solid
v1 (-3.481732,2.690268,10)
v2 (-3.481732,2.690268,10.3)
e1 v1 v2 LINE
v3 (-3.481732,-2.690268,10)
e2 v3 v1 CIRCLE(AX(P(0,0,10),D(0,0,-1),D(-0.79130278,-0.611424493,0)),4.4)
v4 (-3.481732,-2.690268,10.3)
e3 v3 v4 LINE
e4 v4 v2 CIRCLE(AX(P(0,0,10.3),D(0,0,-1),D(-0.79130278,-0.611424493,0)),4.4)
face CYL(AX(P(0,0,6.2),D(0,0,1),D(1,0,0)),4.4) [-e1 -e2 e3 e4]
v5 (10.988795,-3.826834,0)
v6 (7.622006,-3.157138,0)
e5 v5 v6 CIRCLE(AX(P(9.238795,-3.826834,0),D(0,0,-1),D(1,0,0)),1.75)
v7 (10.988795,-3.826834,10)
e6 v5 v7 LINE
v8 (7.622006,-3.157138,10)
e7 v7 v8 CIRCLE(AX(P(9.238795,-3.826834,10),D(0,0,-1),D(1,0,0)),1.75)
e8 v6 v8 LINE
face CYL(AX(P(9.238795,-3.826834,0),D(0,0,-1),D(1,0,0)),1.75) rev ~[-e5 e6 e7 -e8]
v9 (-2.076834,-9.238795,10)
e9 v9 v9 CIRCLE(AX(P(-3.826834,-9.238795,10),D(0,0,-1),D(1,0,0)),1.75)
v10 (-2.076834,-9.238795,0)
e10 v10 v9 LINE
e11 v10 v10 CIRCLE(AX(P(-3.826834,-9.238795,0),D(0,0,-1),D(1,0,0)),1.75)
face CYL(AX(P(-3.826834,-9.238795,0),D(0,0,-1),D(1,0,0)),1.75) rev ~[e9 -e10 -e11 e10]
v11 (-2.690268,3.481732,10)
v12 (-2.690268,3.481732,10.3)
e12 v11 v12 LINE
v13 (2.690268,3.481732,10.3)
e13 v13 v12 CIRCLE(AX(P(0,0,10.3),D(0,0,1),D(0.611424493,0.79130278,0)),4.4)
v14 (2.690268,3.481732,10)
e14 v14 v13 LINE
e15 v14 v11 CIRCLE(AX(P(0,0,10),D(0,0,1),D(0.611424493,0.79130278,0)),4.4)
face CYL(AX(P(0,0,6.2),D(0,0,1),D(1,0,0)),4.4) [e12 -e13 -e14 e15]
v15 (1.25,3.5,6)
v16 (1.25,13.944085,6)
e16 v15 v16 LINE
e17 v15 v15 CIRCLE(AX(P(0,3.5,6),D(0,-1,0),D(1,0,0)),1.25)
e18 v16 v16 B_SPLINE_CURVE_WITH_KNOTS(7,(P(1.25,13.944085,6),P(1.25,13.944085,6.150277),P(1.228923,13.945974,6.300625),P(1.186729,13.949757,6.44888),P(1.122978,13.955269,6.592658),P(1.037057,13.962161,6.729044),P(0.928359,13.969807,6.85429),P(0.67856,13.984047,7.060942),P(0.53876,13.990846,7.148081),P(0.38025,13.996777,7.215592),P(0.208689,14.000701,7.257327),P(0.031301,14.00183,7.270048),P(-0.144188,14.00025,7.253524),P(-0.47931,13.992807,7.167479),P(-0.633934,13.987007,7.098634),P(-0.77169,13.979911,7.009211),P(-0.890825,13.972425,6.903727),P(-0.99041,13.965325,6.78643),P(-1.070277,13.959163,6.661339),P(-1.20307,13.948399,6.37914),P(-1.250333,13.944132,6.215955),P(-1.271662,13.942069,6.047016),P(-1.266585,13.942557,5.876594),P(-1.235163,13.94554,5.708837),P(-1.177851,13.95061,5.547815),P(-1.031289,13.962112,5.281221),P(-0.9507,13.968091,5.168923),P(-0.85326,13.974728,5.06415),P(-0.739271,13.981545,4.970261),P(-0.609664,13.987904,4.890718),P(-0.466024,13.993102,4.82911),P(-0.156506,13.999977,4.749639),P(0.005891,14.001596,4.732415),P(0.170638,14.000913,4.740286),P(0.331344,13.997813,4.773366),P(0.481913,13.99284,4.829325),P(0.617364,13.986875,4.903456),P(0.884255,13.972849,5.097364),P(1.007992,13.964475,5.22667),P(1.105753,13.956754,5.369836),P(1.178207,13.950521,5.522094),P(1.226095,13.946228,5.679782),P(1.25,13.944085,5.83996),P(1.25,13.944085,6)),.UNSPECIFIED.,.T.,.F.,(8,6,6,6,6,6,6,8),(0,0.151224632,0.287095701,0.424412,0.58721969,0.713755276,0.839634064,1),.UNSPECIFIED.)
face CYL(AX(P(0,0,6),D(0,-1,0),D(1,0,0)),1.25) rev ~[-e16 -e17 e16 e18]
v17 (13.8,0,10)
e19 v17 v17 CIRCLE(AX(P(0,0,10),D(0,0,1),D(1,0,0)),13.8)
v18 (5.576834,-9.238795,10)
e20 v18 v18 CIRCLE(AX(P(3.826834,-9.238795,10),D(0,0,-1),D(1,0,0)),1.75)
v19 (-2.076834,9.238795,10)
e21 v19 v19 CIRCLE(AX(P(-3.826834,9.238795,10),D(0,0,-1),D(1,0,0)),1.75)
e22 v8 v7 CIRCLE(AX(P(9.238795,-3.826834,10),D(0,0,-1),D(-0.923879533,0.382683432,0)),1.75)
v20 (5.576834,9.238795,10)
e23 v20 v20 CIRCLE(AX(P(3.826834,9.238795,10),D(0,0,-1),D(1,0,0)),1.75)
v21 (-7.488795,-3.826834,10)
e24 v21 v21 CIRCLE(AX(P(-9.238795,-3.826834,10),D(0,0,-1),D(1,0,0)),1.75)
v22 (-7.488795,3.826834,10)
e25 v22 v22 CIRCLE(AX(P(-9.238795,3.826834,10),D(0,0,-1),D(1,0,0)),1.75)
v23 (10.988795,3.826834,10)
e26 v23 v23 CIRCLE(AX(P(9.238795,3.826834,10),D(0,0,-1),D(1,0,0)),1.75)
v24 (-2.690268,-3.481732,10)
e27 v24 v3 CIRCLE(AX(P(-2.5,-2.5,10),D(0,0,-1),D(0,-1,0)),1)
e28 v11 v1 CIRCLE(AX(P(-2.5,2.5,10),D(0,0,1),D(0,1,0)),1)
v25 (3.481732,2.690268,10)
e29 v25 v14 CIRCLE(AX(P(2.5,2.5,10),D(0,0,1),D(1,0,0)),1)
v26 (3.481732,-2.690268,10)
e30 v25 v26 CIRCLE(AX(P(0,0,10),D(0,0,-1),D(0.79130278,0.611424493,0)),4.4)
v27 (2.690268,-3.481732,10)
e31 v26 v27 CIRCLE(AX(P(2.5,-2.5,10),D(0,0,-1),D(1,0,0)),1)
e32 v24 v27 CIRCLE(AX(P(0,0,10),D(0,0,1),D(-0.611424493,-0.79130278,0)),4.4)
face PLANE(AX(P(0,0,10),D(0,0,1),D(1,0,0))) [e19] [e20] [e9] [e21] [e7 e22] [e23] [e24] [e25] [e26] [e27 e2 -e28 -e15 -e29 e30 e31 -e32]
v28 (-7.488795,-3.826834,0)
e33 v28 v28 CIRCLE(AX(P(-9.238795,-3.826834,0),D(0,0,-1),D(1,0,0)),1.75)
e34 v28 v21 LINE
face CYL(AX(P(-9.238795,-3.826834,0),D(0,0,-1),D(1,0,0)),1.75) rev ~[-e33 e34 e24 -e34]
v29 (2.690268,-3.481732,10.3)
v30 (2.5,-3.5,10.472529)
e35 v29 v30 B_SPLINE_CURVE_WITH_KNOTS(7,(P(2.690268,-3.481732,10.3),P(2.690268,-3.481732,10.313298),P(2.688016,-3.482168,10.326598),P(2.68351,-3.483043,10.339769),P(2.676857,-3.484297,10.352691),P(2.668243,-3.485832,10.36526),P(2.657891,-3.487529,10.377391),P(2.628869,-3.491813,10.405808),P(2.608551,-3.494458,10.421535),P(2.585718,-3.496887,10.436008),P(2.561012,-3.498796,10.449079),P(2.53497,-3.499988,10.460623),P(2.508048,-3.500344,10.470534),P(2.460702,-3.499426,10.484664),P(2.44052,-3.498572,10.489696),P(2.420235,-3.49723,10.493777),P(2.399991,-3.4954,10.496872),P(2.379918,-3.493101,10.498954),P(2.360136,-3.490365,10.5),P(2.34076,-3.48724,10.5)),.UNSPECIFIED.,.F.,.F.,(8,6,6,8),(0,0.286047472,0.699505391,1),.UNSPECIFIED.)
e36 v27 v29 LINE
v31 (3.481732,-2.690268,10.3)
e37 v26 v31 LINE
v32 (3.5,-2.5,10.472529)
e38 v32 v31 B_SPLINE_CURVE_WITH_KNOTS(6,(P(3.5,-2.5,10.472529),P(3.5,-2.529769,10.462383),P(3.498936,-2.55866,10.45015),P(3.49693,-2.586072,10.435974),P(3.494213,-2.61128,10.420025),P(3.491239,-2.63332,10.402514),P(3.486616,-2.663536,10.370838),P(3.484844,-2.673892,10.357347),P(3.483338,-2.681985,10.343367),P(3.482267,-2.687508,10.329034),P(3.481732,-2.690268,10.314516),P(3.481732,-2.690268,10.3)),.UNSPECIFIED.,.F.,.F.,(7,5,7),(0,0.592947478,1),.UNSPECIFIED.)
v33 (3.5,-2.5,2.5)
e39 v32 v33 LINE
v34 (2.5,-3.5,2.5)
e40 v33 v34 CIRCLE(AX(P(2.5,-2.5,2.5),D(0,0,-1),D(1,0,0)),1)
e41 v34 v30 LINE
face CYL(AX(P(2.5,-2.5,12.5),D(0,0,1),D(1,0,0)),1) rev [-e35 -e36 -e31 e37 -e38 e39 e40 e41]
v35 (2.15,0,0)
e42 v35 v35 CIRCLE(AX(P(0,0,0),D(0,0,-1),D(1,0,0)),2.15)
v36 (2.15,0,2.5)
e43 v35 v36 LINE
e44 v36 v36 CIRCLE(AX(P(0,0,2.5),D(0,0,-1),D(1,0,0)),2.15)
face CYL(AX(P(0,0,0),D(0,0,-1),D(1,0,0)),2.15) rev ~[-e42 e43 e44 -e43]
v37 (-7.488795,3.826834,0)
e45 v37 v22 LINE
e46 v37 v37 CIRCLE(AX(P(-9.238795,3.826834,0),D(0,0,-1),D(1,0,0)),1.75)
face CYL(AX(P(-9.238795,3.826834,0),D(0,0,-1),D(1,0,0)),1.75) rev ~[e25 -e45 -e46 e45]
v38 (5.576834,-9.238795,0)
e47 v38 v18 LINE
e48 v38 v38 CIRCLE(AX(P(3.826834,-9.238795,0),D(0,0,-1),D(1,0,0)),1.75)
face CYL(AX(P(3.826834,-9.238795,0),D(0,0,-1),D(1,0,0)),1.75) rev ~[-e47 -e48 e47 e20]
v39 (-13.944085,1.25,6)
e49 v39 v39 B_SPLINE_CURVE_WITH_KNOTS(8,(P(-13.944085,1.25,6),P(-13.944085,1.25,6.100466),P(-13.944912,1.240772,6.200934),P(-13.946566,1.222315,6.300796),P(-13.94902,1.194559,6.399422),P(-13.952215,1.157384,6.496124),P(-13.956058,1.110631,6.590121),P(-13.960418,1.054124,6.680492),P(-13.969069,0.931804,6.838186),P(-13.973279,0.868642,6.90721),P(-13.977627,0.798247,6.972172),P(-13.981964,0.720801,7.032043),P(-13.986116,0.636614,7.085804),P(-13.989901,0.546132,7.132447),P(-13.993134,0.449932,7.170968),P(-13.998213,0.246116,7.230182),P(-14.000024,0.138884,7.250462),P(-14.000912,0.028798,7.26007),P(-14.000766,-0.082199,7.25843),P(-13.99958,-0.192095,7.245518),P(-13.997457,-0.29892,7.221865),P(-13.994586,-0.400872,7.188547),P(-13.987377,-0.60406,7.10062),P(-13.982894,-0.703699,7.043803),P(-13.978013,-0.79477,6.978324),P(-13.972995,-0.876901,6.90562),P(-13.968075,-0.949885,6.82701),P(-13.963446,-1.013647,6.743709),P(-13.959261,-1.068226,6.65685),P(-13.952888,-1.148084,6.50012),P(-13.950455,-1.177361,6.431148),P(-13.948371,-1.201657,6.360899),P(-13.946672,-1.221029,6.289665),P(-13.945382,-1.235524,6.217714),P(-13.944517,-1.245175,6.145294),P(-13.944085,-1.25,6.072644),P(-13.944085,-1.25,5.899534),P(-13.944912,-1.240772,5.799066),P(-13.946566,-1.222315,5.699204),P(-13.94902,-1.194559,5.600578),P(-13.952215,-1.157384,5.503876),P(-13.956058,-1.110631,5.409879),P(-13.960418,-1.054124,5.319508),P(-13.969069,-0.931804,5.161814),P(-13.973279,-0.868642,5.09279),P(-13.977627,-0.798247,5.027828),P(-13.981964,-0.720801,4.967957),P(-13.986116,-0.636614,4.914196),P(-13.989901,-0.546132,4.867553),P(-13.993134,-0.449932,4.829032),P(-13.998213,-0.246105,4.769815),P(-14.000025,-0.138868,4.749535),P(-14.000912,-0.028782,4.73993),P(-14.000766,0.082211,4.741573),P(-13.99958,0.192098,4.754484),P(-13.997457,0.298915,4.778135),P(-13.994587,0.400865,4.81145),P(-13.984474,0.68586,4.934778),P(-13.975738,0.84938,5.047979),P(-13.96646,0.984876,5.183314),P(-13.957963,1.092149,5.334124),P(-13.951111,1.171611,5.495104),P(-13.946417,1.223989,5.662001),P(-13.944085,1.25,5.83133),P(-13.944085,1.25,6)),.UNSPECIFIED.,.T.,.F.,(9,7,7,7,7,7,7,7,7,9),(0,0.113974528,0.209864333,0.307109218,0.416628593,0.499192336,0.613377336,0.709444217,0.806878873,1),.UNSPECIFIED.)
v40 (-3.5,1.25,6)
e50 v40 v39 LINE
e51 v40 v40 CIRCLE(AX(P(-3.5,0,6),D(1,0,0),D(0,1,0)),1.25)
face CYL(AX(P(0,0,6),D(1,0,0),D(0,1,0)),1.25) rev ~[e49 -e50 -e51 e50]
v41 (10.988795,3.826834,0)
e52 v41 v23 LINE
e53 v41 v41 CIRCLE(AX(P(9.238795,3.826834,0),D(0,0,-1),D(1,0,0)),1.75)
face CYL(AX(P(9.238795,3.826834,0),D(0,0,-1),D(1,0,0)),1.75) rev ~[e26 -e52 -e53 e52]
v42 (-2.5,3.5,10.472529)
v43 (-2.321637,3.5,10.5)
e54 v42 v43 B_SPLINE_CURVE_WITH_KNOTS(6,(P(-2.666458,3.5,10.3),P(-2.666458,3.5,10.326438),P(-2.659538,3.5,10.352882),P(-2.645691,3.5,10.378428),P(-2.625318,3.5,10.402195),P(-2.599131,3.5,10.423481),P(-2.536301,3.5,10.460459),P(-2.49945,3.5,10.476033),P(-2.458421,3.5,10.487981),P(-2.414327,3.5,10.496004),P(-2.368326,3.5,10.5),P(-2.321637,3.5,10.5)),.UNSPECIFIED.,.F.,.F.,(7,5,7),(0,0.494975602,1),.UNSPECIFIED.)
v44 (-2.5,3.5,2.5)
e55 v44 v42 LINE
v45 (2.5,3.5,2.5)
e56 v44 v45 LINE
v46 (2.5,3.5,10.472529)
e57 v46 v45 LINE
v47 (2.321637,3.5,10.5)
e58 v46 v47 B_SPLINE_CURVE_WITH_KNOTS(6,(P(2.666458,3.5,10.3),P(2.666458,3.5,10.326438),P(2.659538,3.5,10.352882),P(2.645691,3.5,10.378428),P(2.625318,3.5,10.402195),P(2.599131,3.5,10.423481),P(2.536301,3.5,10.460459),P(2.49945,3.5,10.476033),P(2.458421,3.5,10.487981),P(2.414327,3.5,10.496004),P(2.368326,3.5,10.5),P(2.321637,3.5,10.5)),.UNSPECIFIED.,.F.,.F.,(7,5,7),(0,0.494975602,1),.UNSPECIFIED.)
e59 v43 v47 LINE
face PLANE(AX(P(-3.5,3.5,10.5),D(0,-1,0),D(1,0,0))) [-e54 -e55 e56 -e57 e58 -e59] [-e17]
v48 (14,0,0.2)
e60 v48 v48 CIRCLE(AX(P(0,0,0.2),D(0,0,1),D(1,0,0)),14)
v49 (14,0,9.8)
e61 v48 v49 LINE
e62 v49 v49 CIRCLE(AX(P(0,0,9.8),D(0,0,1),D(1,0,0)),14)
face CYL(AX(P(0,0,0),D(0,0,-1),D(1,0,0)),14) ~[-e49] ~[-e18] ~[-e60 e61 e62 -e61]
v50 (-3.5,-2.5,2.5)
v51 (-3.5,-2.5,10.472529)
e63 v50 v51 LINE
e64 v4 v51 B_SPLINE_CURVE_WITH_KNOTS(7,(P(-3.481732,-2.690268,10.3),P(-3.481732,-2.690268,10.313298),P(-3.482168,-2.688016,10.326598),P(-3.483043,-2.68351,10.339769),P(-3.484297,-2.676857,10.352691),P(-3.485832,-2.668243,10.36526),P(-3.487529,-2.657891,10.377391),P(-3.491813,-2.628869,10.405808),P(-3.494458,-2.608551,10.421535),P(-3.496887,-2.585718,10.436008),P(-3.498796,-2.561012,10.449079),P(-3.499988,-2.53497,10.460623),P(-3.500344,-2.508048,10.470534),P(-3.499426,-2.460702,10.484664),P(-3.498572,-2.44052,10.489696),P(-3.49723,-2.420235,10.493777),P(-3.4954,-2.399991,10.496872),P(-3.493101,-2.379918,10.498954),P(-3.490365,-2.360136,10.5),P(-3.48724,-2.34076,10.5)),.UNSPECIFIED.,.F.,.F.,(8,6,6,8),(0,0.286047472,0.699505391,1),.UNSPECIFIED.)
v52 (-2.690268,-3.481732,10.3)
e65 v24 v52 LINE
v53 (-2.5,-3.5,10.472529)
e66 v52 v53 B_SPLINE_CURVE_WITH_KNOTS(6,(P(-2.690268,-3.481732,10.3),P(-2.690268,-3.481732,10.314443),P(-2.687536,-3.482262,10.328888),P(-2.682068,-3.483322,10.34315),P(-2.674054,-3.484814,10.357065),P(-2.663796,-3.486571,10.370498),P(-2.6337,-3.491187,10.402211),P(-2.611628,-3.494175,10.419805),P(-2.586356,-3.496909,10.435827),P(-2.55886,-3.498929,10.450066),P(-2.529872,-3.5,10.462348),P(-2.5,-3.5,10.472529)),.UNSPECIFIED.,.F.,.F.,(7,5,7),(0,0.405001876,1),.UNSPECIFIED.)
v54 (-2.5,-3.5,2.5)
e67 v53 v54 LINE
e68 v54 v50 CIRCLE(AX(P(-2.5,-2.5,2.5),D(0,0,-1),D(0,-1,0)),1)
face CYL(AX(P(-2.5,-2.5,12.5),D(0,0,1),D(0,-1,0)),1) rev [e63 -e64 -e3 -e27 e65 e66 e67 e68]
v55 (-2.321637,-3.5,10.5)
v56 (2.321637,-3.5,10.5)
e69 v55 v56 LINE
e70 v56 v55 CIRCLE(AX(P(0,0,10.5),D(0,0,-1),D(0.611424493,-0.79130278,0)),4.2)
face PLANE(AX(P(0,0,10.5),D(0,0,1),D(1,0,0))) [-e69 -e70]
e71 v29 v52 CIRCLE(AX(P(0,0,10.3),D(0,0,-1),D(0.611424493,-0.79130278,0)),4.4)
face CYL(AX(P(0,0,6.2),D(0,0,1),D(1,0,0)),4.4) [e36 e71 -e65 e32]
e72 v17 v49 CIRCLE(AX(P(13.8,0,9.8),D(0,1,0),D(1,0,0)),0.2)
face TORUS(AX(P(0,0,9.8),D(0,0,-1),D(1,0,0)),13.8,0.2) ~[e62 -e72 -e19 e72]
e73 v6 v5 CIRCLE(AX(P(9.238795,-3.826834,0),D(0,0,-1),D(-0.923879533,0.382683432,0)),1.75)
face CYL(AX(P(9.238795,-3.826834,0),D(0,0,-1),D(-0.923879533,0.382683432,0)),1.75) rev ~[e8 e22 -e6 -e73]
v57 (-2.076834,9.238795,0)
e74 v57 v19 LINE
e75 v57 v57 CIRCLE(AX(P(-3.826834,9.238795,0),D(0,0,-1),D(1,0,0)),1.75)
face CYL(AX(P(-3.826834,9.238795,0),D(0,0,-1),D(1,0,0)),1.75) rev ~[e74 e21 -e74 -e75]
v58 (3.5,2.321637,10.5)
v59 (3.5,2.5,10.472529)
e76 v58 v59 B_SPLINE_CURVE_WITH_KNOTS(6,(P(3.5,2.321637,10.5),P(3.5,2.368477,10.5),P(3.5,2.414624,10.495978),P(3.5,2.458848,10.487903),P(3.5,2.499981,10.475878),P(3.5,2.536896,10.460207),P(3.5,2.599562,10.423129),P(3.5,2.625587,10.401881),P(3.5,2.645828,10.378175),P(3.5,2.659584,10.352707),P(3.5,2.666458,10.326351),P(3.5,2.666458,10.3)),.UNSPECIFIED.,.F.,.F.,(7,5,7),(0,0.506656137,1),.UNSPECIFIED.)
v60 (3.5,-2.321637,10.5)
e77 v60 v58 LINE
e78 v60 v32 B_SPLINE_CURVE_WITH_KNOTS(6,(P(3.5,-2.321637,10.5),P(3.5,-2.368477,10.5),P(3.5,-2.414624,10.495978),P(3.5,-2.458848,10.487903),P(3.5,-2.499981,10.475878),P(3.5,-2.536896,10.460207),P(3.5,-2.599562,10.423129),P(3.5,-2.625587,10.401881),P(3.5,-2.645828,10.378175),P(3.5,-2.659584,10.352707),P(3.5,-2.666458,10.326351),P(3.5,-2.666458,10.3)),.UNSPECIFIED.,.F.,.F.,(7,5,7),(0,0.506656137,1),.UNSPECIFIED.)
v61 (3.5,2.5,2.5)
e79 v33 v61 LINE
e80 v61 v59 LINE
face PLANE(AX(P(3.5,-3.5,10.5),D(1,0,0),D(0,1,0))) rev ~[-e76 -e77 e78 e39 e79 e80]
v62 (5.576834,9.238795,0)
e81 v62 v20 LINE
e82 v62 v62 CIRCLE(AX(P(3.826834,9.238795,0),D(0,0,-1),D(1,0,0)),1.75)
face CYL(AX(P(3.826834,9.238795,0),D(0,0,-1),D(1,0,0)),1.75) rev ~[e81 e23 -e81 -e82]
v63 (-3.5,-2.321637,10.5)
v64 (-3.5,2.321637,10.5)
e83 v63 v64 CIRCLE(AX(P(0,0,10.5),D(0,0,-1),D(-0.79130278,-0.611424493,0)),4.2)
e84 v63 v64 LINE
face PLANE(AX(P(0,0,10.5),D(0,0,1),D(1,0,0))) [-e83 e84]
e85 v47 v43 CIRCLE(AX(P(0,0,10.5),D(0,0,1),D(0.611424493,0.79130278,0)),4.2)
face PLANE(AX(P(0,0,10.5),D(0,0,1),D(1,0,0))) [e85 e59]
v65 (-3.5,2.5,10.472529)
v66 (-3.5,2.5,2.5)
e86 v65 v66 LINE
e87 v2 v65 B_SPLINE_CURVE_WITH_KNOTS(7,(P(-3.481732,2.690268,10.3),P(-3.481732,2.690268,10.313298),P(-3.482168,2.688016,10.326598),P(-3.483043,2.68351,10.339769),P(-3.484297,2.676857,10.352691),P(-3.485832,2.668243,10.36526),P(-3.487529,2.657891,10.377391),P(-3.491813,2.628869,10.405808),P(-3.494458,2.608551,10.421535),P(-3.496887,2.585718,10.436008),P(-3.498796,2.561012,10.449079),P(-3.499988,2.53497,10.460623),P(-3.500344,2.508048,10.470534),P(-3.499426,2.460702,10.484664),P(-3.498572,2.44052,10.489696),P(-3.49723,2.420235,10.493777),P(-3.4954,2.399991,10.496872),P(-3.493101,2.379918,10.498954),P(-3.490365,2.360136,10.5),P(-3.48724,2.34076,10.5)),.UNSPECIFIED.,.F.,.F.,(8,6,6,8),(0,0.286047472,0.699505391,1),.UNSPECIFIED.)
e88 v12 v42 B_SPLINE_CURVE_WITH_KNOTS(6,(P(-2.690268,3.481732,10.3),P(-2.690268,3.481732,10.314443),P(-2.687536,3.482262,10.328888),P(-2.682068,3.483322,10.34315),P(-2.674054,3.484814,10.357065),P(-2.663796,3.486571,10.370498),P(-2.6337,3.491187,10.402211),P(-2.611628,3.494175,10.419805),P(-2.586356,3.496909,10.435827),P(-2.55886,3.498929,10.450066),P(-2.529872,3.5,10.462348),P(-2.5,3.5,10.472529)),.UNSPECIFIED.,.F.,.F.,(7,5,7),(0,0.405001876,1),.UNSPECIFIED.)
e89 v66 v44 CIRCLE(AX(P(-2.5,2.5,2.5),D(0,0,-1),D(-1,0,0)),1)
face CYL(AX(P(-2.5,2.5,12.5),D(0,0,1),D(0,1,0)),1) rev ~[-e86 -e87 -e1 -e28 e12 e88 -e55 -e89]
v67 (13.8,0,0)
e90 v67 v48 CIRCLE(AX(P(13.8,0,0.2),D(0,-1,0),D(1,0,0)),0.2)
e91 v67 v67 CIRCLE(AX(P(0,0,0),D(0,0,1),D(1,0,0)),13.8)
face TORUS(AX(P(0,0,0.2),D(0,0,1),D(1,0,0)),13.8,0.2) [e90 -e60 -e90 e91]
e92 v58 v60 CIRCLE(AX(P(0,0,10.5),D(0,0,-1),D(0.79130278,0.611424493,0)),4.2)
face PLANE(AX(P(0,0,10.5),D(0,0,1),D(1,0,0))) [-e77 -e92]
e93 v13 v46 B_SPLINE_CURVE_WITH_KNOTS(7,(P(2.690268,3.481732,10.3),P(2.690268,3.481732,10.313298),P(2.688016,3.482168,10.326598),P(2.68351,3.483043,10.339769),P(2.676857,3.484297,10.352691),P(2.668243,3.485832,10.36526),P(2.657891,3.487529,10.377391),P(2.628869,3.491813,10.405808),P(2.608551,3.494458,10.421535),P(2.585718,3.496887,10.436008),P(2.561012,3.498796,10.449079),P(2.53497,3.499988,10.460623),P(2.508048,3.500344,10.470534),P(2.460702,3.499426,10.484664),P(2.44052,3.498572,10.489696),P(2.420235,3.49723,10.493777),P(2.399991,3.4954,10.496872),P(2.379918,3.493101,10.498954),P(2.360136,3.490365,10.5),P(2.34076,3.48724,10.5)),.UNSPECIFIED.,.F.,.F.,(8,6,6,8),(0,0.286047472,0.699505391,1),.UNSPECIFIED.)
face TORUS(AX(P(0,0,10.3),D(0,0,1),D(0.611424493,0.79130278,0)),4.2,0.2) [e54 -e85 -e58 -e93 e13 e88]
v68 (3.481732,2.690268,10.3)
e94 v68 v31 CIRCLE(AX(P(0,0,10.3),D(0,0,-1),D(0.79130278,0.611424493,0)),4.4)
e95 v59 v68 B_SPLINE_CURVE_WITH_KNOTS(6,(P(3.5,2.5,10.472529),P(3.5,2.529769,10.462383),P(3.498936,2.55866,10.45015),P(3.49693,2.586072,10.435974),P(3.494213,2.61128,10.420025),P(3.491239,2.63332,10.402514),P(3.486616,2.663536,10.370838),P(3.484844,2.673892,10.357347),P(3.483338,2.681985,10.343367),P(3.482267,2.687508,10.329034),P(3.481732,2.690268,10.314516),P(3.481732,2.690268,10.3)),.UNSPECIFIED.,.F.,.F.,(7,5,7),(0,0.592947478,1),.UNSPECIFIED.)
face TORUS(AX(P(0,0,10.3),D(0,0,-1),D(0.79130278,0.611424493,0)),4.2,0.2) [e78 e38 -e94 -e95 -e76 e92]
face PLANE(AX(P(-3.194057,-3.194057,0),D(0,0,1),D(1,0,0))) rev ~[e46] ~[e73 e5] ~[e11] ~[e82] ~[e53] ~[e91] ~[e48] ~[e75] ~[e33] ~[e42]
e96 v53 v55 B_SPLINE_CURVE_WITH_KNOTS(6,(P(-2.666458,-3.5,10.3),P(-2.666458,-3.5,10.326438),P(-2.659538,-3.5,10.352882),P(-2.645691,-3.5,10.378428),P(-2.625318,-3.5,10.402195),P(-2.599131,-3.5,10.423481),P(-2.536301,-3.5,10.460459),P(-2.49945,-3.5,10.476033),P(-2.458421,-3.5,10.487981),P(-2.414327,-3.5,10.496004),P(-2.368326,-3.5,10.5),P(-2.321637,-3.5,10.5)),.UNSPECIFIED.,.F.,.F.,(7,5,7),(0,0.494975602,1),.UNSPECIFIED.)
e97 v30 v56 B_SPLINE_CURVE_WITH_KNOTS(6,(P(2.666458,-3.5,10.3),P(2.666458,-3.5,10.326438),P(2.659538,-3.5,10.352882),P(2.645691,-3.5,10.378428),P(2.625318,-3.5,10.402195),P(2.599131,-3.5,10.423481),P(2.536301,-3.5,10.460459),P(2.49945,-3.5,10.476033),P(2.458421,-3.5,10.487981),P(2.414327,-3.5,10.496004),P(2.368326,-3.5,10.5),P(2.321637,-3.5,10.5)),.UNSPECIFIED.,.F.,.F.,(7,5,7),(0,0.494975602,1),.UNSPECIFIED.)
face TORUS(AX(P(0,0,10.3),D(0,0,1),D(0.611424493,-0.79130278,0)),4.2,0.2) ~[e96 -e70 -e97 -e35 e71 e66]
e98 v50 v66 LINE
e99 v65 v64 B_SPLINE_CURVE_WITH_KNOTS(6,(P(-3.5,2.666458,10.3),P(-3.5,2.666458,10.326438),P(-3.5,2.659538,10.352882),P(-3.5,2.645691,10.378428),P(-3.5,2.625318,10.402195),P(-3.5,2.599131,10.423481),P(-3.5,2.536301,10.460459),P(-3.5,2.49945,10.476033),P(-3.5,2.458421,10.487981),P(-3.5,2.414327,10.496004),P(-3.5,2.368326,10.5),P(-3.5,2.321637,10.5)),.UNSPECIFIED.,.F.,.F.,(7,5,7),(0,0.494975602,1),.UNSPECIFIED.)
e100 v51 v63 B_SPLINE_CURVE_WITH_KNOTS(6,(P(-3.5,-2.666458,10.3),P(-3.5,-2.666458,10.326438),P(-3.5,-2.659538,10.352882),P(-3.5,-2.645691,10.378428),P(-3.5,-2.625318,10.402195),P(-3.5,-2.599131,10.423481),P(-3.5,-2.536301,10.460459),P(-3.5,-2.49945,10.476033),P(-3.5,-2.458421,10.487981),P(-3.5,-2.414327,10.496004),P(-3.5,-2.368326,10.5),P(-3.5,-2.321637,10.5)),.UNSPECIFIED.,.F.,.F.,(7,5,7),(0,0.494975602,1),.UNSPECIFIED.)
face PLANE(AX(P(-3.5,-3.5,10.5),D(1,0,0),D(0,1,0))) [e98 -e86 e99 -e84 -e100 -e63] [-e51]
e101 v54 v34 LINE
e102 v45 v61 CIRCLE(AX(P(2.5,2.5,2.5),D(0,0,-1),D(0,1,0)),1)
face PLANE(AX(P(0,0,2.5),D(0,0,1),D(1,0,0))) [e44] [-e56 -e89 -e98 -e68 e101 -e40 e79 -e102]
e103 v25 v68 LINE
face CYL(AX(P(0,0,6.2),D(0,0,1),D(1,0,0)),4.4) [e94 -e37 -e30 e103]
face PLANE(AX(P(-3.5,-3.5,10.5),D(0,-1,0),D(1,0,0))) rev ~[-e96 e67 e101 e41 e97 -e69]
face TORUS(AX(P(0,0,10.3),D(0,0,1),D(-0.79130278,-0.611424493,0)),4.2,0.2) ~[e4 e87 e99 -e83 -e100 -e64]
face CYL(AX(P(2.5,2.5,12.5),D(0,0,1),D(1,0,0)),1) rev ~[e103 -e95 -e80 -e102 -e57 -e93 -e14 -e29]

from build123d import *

# Parameters (mm, degrees)
F0_R          = 14
F1_DEPTH      = 10
F2_R          = 4.4
F3_DEPTH      = 0.5
F4_W          = 7
F4_H          = 7
F5_DEPTH      = 8
F6_R          = 2.15
F7_DEPTH      = 2.5
F8_R          = 1.75
F9_DEPTH      = 10
F10_R         = 1.25
F11_DEPTH     = 25
F12_R         = 1.25
F13_DEPTH     = 25
F14_T1_DEPTH  = 10
F14_T6_DEPTH  = 12.5
F14_S7_R      = 4.4
F14_T8_DEPTH  = 8
F14_T13_DEPTH = 12.5
F14_S14_R     = 4.4
F14_T15_DEPTH = 8
F14_T20_DEPTH = 12.5
F14_S21_R     = 4.4
F14_T22_DEPTH = 8
F14_T27_DEPTH = 12.5
F14_S28_R     = 4.4
F14_T29_DEPTH = 8
F15_R         = 0.2


# Not quite as in the source:
# - a fillet or chamfer that OpenCascade refuses, or shapes differently, is made with other operations: its cross-section is extruded or revolved along the edge and cut away or added
# - a feature names something its author has since deleted; it is built from what else it names


with BuildPart() as f1:
    # F0 (on Top) → F1 (new body)
    with BuildSketch(Plane.XY):
        Circle(F0_R)
    extrude(amount=F1_DEPTH)

    # F2 (on face) → F3 (join)
    with BuildSketch(Plane.XY.offset(10)):
        Circle(F2_R)
    extrude(amount=F3_DEPTH)

    # F4 (on face) → F5 (cut)
    with BuildSketch(Plane.XY.offset(10.5)):
        Rectangle(F4_W, F4_H)
    extrude(amount=-F5_DEPTH, mode=Mode.SUBTRACT)

    # F6 (on face) → F7 (cut, through all)
    with BuildSketch(Plane(origin=(0, 0, 0), x_dir=(1, 0, 0), z_dir=(0, 0, -1))):
        Circle(F6_R)
    extrude(amount=-F7_DEPTH, mode=Mode.SUBTRACT)

    # F8 (on face) → F9 (cut, through all)
    with BuildSketch(Plane(origin=(0, 0, 0), x_dir=(1, 0, 0), z_dir=(0, 0, -1))):
        with BuildLine():
            ThreePointArc((7.6220061432, 3.157138317), (9.5802033886, 2.1104600829), (10.9887953251, 3.8268343237))
            ThreePointArc((10.9887953251, 3.8268343237), (8.8973872616, 5.5432085644), (7.6220061432, 3.157138317))
        make_face()
        with Locations((3.8268343237, 9.2387953251)):
            Circle(F8_R)
        with Locations((-3.8268343237, 9.2387953251)):
            Circle(F8_R)
        with Locations((-9.2387953251, 3.8268343237)):
            Circle(F8_R)
        with Locations((-9.2387953251, -3.8268343237)):
            Circle(F8_R)
        with Locations((-3.8268343237, -9.2387953251)):
            Circle(F8_R)
        with Locations((3.8268343237, -9.2387953251)):
            Circle(F8_R)
        with Locations((9.2387953251, -3.8268343237)):
            Circle(F8_R)
    extrude(amount=-F9_DEPTH, mode=Mode.SUBTRACT)

    # F10 (on Front) → F11 (cut)
    with BuildSketch(Plane.XZ):
        with Locations((0, 6)):
            Circle(F10_R)
    extrude(amount=-F11_DEPTH, mode=Mode.SUBTRACT)

    # F12 (on Right) → F13 (cut)
    with BuildSketch(Plane.YZ):
        with Locations((0, 6)):
            Circle(F12_R)
    extrude(amount=-F13_DEPTH, mode=Mode.SUBTRACT)

    # F14: fillet of radius 1 on 4 edges, made by hand

    # F14_s2 → F14_t1 (join)
    with BuildSketch(Plane.XY):
        with BuildLine():
            ThreePointArc((-2.5, -3.5), (-3.2071067812, -3.2071067812), (-3.5, -2.5))
            Line((-3.5, -2.5), (-3.5, -3.5))
            Line((-3.5, -3.5), (-2.5, -3.5))
        make_face()
        with BuildLine():
            ThreePointArc((3.5, -2.5), (3.2071067812, -3.2071067812), (2.5, -3.5))
            Line((2.5, -3.5), (3.5, -3.5))
            Line((3.5, -3.5), (3.5, -2.5))
        make_face()
        with BuildLine():
            ThreePointArc((3.5, 2.5), (3.2071067812, 3.2071067812), (2.5, 3.5))
            Line((2.5, 3.5), (3.5, 3.5))
            Line((3.5, 3.5), (3.5, 2.5))
        make_face()
        with BuildLine():
            ThreePointArc((-2.5, 3.5), (-3.2071067812, 3.2071067812), (-3.5, 2.5))
            Line((-3.5, 2.5), (-3.5, 3.5))
            Line((-3.5, 3.5), (-2.5, 3.5))
        make_face()
    extrude(amount=F14_T1_DEPTH)


with BuildPart() as f14_tool4:
    # F14_s5 → F14_t6 (new body)
    with BuildSketch(Plane.XY.offset(12.5)):
        with BuildLine():
            ThreePointArc((-2.5, -3.5), (-3.2071067812, -3.2071067812), (-3.5, -2.5))
            Line((-3.5, -2.5), (-3.5, -3.5))
            Line((-3.5, -3.5), (-2.5, -3.5))
        make_face()
    extrude(amount=-F14_T6_DEPTH)

    # F14_s7 → F14_t8 (intersect, symmetric)
    with BuildSketch(Plane.XY.offset(6.2)):
        Circle(F14_S7_R)
    extrude(amount=F14_T8_DEPTH, both=True, mode=Mode.INTERSECT)

    split(bisect_by=Plane.XY.offset(10.5), keep=Keep.BOTTOM)


with BuildPart() as f1_1:
    add(f1.part)

    # F14_t3: union F14_tool4
    add(f14_tool4.part)


with BuildPart() as f14_tool11:
    # F14_s12 → F14_t13 (new body)
    with BuildSketch(Plane.XY.offset(12.5)):
        with BuildLine():
            ThreePointArc((3.5, -2.5), (3.2071067812, -3.2071067812), (2.5, -3.5))
            Line((2.5, -3.5), (3.5, -3.5))
            Line((3.5, -3.5), (3.5, -2.5))
        make_face()
    extrude(amount=-F14_T13_DEPTH)

    # F14_s14 → F14_t15 (intersect, symmetric)
    with BuildSketch(Plane.XY.offset(6.2)):
        Circle(F14_S14_R)
    extrude(amount=F14_T15_DEPTH, both=True, mode=Mode.INTERSECT)

    split(bisect_by=Plane.XY.offset(10.5), keep=Keep.BOTTOM)


with BuildPart() as f1_2:
    add(f1_1.part)

    # F14_t10: union F14_tool11
    add(f14_tool11.part)


with BuildPart() as f14_tool18:
    # F14_s19 → F14_t20 (new body)
    with BuildSketch(Plane.XY.offset(12.5)):
        with BuildLine():
            ThreePointArc((3.5, 2.5), (3.2071067812, 3.2071067812), (2.5, 3.5))
            Line((2.5, 3.5), (3.5, 3.5))
            Line((3.5, 3.5), (3.5, 2.5))
        make_face()
    extrude(amount=-F14_T20_DEPTH)

    # F14_s21 → F14_t22 (intersect, symmetric)
    with BuildSketch(Plane.XY.offset(6.2)):
        Circle(F14_S21_R)
    extrude(amount=F14_T22_DEPTH, both=True, mode=Mode.INTERSECT)

    split(bisect_by=Plane.XY.offset(10.5), keep=Keep.BOTTOM)


with BuildPart() as f1_3:
    add(f1_2.part)

    # F14_t17: union F14_tool18
    add(f14_tool18.part)


with BuildPart() as f14_tool25:
    # F14_s26 → F14_t27 (new body)
    with BuildSketch(Plane.XY.offset(12.5)):
        with BuildLine():
            ThreePointArc((-2.5, 3.5), (-3.2071067812, 3.2071067812), (-3.5, 2.5))
            Line((-3.5, 2.5), (-3.5, 3.5))
            Line((-3.5, 3.5), (-2.5, 3.5))
        make_face()
    extrude(amount=-F14_T27_DEPTH)

    # F14_s28 → F14_t29 (intersect, symmetric)
    with BuildSketch(Plane.XY.offset(6.2)):
        Circle(F14_S28_R)
    extrude(amount=F14_T29_DEPTH, both=True, mode=Mode.INTERSECT)

    split(bisect_by=Plane.XY.offset(10.5), keep=Keep.BOTTOM)


with BuildPart() as f1_4:
    add(f1_3.part)

    # F14_t24: union F14_tool25
    add(f14_tool25.part)

    # F15
    f15_edges = [f1_4.edges().sort_by_distance(p)[0] for p in [
        (-14, 0, 10),
        (-14, 0, 0),
        (-4.4, 0, 10.5),
        (0, -4.4, 10.5),
        (4.4, 0, 10.5),
        (0, 4.4, 10.5),
    ]]
    fillet(f15_edges, radius=F15_R)


solid = f1_4.part
